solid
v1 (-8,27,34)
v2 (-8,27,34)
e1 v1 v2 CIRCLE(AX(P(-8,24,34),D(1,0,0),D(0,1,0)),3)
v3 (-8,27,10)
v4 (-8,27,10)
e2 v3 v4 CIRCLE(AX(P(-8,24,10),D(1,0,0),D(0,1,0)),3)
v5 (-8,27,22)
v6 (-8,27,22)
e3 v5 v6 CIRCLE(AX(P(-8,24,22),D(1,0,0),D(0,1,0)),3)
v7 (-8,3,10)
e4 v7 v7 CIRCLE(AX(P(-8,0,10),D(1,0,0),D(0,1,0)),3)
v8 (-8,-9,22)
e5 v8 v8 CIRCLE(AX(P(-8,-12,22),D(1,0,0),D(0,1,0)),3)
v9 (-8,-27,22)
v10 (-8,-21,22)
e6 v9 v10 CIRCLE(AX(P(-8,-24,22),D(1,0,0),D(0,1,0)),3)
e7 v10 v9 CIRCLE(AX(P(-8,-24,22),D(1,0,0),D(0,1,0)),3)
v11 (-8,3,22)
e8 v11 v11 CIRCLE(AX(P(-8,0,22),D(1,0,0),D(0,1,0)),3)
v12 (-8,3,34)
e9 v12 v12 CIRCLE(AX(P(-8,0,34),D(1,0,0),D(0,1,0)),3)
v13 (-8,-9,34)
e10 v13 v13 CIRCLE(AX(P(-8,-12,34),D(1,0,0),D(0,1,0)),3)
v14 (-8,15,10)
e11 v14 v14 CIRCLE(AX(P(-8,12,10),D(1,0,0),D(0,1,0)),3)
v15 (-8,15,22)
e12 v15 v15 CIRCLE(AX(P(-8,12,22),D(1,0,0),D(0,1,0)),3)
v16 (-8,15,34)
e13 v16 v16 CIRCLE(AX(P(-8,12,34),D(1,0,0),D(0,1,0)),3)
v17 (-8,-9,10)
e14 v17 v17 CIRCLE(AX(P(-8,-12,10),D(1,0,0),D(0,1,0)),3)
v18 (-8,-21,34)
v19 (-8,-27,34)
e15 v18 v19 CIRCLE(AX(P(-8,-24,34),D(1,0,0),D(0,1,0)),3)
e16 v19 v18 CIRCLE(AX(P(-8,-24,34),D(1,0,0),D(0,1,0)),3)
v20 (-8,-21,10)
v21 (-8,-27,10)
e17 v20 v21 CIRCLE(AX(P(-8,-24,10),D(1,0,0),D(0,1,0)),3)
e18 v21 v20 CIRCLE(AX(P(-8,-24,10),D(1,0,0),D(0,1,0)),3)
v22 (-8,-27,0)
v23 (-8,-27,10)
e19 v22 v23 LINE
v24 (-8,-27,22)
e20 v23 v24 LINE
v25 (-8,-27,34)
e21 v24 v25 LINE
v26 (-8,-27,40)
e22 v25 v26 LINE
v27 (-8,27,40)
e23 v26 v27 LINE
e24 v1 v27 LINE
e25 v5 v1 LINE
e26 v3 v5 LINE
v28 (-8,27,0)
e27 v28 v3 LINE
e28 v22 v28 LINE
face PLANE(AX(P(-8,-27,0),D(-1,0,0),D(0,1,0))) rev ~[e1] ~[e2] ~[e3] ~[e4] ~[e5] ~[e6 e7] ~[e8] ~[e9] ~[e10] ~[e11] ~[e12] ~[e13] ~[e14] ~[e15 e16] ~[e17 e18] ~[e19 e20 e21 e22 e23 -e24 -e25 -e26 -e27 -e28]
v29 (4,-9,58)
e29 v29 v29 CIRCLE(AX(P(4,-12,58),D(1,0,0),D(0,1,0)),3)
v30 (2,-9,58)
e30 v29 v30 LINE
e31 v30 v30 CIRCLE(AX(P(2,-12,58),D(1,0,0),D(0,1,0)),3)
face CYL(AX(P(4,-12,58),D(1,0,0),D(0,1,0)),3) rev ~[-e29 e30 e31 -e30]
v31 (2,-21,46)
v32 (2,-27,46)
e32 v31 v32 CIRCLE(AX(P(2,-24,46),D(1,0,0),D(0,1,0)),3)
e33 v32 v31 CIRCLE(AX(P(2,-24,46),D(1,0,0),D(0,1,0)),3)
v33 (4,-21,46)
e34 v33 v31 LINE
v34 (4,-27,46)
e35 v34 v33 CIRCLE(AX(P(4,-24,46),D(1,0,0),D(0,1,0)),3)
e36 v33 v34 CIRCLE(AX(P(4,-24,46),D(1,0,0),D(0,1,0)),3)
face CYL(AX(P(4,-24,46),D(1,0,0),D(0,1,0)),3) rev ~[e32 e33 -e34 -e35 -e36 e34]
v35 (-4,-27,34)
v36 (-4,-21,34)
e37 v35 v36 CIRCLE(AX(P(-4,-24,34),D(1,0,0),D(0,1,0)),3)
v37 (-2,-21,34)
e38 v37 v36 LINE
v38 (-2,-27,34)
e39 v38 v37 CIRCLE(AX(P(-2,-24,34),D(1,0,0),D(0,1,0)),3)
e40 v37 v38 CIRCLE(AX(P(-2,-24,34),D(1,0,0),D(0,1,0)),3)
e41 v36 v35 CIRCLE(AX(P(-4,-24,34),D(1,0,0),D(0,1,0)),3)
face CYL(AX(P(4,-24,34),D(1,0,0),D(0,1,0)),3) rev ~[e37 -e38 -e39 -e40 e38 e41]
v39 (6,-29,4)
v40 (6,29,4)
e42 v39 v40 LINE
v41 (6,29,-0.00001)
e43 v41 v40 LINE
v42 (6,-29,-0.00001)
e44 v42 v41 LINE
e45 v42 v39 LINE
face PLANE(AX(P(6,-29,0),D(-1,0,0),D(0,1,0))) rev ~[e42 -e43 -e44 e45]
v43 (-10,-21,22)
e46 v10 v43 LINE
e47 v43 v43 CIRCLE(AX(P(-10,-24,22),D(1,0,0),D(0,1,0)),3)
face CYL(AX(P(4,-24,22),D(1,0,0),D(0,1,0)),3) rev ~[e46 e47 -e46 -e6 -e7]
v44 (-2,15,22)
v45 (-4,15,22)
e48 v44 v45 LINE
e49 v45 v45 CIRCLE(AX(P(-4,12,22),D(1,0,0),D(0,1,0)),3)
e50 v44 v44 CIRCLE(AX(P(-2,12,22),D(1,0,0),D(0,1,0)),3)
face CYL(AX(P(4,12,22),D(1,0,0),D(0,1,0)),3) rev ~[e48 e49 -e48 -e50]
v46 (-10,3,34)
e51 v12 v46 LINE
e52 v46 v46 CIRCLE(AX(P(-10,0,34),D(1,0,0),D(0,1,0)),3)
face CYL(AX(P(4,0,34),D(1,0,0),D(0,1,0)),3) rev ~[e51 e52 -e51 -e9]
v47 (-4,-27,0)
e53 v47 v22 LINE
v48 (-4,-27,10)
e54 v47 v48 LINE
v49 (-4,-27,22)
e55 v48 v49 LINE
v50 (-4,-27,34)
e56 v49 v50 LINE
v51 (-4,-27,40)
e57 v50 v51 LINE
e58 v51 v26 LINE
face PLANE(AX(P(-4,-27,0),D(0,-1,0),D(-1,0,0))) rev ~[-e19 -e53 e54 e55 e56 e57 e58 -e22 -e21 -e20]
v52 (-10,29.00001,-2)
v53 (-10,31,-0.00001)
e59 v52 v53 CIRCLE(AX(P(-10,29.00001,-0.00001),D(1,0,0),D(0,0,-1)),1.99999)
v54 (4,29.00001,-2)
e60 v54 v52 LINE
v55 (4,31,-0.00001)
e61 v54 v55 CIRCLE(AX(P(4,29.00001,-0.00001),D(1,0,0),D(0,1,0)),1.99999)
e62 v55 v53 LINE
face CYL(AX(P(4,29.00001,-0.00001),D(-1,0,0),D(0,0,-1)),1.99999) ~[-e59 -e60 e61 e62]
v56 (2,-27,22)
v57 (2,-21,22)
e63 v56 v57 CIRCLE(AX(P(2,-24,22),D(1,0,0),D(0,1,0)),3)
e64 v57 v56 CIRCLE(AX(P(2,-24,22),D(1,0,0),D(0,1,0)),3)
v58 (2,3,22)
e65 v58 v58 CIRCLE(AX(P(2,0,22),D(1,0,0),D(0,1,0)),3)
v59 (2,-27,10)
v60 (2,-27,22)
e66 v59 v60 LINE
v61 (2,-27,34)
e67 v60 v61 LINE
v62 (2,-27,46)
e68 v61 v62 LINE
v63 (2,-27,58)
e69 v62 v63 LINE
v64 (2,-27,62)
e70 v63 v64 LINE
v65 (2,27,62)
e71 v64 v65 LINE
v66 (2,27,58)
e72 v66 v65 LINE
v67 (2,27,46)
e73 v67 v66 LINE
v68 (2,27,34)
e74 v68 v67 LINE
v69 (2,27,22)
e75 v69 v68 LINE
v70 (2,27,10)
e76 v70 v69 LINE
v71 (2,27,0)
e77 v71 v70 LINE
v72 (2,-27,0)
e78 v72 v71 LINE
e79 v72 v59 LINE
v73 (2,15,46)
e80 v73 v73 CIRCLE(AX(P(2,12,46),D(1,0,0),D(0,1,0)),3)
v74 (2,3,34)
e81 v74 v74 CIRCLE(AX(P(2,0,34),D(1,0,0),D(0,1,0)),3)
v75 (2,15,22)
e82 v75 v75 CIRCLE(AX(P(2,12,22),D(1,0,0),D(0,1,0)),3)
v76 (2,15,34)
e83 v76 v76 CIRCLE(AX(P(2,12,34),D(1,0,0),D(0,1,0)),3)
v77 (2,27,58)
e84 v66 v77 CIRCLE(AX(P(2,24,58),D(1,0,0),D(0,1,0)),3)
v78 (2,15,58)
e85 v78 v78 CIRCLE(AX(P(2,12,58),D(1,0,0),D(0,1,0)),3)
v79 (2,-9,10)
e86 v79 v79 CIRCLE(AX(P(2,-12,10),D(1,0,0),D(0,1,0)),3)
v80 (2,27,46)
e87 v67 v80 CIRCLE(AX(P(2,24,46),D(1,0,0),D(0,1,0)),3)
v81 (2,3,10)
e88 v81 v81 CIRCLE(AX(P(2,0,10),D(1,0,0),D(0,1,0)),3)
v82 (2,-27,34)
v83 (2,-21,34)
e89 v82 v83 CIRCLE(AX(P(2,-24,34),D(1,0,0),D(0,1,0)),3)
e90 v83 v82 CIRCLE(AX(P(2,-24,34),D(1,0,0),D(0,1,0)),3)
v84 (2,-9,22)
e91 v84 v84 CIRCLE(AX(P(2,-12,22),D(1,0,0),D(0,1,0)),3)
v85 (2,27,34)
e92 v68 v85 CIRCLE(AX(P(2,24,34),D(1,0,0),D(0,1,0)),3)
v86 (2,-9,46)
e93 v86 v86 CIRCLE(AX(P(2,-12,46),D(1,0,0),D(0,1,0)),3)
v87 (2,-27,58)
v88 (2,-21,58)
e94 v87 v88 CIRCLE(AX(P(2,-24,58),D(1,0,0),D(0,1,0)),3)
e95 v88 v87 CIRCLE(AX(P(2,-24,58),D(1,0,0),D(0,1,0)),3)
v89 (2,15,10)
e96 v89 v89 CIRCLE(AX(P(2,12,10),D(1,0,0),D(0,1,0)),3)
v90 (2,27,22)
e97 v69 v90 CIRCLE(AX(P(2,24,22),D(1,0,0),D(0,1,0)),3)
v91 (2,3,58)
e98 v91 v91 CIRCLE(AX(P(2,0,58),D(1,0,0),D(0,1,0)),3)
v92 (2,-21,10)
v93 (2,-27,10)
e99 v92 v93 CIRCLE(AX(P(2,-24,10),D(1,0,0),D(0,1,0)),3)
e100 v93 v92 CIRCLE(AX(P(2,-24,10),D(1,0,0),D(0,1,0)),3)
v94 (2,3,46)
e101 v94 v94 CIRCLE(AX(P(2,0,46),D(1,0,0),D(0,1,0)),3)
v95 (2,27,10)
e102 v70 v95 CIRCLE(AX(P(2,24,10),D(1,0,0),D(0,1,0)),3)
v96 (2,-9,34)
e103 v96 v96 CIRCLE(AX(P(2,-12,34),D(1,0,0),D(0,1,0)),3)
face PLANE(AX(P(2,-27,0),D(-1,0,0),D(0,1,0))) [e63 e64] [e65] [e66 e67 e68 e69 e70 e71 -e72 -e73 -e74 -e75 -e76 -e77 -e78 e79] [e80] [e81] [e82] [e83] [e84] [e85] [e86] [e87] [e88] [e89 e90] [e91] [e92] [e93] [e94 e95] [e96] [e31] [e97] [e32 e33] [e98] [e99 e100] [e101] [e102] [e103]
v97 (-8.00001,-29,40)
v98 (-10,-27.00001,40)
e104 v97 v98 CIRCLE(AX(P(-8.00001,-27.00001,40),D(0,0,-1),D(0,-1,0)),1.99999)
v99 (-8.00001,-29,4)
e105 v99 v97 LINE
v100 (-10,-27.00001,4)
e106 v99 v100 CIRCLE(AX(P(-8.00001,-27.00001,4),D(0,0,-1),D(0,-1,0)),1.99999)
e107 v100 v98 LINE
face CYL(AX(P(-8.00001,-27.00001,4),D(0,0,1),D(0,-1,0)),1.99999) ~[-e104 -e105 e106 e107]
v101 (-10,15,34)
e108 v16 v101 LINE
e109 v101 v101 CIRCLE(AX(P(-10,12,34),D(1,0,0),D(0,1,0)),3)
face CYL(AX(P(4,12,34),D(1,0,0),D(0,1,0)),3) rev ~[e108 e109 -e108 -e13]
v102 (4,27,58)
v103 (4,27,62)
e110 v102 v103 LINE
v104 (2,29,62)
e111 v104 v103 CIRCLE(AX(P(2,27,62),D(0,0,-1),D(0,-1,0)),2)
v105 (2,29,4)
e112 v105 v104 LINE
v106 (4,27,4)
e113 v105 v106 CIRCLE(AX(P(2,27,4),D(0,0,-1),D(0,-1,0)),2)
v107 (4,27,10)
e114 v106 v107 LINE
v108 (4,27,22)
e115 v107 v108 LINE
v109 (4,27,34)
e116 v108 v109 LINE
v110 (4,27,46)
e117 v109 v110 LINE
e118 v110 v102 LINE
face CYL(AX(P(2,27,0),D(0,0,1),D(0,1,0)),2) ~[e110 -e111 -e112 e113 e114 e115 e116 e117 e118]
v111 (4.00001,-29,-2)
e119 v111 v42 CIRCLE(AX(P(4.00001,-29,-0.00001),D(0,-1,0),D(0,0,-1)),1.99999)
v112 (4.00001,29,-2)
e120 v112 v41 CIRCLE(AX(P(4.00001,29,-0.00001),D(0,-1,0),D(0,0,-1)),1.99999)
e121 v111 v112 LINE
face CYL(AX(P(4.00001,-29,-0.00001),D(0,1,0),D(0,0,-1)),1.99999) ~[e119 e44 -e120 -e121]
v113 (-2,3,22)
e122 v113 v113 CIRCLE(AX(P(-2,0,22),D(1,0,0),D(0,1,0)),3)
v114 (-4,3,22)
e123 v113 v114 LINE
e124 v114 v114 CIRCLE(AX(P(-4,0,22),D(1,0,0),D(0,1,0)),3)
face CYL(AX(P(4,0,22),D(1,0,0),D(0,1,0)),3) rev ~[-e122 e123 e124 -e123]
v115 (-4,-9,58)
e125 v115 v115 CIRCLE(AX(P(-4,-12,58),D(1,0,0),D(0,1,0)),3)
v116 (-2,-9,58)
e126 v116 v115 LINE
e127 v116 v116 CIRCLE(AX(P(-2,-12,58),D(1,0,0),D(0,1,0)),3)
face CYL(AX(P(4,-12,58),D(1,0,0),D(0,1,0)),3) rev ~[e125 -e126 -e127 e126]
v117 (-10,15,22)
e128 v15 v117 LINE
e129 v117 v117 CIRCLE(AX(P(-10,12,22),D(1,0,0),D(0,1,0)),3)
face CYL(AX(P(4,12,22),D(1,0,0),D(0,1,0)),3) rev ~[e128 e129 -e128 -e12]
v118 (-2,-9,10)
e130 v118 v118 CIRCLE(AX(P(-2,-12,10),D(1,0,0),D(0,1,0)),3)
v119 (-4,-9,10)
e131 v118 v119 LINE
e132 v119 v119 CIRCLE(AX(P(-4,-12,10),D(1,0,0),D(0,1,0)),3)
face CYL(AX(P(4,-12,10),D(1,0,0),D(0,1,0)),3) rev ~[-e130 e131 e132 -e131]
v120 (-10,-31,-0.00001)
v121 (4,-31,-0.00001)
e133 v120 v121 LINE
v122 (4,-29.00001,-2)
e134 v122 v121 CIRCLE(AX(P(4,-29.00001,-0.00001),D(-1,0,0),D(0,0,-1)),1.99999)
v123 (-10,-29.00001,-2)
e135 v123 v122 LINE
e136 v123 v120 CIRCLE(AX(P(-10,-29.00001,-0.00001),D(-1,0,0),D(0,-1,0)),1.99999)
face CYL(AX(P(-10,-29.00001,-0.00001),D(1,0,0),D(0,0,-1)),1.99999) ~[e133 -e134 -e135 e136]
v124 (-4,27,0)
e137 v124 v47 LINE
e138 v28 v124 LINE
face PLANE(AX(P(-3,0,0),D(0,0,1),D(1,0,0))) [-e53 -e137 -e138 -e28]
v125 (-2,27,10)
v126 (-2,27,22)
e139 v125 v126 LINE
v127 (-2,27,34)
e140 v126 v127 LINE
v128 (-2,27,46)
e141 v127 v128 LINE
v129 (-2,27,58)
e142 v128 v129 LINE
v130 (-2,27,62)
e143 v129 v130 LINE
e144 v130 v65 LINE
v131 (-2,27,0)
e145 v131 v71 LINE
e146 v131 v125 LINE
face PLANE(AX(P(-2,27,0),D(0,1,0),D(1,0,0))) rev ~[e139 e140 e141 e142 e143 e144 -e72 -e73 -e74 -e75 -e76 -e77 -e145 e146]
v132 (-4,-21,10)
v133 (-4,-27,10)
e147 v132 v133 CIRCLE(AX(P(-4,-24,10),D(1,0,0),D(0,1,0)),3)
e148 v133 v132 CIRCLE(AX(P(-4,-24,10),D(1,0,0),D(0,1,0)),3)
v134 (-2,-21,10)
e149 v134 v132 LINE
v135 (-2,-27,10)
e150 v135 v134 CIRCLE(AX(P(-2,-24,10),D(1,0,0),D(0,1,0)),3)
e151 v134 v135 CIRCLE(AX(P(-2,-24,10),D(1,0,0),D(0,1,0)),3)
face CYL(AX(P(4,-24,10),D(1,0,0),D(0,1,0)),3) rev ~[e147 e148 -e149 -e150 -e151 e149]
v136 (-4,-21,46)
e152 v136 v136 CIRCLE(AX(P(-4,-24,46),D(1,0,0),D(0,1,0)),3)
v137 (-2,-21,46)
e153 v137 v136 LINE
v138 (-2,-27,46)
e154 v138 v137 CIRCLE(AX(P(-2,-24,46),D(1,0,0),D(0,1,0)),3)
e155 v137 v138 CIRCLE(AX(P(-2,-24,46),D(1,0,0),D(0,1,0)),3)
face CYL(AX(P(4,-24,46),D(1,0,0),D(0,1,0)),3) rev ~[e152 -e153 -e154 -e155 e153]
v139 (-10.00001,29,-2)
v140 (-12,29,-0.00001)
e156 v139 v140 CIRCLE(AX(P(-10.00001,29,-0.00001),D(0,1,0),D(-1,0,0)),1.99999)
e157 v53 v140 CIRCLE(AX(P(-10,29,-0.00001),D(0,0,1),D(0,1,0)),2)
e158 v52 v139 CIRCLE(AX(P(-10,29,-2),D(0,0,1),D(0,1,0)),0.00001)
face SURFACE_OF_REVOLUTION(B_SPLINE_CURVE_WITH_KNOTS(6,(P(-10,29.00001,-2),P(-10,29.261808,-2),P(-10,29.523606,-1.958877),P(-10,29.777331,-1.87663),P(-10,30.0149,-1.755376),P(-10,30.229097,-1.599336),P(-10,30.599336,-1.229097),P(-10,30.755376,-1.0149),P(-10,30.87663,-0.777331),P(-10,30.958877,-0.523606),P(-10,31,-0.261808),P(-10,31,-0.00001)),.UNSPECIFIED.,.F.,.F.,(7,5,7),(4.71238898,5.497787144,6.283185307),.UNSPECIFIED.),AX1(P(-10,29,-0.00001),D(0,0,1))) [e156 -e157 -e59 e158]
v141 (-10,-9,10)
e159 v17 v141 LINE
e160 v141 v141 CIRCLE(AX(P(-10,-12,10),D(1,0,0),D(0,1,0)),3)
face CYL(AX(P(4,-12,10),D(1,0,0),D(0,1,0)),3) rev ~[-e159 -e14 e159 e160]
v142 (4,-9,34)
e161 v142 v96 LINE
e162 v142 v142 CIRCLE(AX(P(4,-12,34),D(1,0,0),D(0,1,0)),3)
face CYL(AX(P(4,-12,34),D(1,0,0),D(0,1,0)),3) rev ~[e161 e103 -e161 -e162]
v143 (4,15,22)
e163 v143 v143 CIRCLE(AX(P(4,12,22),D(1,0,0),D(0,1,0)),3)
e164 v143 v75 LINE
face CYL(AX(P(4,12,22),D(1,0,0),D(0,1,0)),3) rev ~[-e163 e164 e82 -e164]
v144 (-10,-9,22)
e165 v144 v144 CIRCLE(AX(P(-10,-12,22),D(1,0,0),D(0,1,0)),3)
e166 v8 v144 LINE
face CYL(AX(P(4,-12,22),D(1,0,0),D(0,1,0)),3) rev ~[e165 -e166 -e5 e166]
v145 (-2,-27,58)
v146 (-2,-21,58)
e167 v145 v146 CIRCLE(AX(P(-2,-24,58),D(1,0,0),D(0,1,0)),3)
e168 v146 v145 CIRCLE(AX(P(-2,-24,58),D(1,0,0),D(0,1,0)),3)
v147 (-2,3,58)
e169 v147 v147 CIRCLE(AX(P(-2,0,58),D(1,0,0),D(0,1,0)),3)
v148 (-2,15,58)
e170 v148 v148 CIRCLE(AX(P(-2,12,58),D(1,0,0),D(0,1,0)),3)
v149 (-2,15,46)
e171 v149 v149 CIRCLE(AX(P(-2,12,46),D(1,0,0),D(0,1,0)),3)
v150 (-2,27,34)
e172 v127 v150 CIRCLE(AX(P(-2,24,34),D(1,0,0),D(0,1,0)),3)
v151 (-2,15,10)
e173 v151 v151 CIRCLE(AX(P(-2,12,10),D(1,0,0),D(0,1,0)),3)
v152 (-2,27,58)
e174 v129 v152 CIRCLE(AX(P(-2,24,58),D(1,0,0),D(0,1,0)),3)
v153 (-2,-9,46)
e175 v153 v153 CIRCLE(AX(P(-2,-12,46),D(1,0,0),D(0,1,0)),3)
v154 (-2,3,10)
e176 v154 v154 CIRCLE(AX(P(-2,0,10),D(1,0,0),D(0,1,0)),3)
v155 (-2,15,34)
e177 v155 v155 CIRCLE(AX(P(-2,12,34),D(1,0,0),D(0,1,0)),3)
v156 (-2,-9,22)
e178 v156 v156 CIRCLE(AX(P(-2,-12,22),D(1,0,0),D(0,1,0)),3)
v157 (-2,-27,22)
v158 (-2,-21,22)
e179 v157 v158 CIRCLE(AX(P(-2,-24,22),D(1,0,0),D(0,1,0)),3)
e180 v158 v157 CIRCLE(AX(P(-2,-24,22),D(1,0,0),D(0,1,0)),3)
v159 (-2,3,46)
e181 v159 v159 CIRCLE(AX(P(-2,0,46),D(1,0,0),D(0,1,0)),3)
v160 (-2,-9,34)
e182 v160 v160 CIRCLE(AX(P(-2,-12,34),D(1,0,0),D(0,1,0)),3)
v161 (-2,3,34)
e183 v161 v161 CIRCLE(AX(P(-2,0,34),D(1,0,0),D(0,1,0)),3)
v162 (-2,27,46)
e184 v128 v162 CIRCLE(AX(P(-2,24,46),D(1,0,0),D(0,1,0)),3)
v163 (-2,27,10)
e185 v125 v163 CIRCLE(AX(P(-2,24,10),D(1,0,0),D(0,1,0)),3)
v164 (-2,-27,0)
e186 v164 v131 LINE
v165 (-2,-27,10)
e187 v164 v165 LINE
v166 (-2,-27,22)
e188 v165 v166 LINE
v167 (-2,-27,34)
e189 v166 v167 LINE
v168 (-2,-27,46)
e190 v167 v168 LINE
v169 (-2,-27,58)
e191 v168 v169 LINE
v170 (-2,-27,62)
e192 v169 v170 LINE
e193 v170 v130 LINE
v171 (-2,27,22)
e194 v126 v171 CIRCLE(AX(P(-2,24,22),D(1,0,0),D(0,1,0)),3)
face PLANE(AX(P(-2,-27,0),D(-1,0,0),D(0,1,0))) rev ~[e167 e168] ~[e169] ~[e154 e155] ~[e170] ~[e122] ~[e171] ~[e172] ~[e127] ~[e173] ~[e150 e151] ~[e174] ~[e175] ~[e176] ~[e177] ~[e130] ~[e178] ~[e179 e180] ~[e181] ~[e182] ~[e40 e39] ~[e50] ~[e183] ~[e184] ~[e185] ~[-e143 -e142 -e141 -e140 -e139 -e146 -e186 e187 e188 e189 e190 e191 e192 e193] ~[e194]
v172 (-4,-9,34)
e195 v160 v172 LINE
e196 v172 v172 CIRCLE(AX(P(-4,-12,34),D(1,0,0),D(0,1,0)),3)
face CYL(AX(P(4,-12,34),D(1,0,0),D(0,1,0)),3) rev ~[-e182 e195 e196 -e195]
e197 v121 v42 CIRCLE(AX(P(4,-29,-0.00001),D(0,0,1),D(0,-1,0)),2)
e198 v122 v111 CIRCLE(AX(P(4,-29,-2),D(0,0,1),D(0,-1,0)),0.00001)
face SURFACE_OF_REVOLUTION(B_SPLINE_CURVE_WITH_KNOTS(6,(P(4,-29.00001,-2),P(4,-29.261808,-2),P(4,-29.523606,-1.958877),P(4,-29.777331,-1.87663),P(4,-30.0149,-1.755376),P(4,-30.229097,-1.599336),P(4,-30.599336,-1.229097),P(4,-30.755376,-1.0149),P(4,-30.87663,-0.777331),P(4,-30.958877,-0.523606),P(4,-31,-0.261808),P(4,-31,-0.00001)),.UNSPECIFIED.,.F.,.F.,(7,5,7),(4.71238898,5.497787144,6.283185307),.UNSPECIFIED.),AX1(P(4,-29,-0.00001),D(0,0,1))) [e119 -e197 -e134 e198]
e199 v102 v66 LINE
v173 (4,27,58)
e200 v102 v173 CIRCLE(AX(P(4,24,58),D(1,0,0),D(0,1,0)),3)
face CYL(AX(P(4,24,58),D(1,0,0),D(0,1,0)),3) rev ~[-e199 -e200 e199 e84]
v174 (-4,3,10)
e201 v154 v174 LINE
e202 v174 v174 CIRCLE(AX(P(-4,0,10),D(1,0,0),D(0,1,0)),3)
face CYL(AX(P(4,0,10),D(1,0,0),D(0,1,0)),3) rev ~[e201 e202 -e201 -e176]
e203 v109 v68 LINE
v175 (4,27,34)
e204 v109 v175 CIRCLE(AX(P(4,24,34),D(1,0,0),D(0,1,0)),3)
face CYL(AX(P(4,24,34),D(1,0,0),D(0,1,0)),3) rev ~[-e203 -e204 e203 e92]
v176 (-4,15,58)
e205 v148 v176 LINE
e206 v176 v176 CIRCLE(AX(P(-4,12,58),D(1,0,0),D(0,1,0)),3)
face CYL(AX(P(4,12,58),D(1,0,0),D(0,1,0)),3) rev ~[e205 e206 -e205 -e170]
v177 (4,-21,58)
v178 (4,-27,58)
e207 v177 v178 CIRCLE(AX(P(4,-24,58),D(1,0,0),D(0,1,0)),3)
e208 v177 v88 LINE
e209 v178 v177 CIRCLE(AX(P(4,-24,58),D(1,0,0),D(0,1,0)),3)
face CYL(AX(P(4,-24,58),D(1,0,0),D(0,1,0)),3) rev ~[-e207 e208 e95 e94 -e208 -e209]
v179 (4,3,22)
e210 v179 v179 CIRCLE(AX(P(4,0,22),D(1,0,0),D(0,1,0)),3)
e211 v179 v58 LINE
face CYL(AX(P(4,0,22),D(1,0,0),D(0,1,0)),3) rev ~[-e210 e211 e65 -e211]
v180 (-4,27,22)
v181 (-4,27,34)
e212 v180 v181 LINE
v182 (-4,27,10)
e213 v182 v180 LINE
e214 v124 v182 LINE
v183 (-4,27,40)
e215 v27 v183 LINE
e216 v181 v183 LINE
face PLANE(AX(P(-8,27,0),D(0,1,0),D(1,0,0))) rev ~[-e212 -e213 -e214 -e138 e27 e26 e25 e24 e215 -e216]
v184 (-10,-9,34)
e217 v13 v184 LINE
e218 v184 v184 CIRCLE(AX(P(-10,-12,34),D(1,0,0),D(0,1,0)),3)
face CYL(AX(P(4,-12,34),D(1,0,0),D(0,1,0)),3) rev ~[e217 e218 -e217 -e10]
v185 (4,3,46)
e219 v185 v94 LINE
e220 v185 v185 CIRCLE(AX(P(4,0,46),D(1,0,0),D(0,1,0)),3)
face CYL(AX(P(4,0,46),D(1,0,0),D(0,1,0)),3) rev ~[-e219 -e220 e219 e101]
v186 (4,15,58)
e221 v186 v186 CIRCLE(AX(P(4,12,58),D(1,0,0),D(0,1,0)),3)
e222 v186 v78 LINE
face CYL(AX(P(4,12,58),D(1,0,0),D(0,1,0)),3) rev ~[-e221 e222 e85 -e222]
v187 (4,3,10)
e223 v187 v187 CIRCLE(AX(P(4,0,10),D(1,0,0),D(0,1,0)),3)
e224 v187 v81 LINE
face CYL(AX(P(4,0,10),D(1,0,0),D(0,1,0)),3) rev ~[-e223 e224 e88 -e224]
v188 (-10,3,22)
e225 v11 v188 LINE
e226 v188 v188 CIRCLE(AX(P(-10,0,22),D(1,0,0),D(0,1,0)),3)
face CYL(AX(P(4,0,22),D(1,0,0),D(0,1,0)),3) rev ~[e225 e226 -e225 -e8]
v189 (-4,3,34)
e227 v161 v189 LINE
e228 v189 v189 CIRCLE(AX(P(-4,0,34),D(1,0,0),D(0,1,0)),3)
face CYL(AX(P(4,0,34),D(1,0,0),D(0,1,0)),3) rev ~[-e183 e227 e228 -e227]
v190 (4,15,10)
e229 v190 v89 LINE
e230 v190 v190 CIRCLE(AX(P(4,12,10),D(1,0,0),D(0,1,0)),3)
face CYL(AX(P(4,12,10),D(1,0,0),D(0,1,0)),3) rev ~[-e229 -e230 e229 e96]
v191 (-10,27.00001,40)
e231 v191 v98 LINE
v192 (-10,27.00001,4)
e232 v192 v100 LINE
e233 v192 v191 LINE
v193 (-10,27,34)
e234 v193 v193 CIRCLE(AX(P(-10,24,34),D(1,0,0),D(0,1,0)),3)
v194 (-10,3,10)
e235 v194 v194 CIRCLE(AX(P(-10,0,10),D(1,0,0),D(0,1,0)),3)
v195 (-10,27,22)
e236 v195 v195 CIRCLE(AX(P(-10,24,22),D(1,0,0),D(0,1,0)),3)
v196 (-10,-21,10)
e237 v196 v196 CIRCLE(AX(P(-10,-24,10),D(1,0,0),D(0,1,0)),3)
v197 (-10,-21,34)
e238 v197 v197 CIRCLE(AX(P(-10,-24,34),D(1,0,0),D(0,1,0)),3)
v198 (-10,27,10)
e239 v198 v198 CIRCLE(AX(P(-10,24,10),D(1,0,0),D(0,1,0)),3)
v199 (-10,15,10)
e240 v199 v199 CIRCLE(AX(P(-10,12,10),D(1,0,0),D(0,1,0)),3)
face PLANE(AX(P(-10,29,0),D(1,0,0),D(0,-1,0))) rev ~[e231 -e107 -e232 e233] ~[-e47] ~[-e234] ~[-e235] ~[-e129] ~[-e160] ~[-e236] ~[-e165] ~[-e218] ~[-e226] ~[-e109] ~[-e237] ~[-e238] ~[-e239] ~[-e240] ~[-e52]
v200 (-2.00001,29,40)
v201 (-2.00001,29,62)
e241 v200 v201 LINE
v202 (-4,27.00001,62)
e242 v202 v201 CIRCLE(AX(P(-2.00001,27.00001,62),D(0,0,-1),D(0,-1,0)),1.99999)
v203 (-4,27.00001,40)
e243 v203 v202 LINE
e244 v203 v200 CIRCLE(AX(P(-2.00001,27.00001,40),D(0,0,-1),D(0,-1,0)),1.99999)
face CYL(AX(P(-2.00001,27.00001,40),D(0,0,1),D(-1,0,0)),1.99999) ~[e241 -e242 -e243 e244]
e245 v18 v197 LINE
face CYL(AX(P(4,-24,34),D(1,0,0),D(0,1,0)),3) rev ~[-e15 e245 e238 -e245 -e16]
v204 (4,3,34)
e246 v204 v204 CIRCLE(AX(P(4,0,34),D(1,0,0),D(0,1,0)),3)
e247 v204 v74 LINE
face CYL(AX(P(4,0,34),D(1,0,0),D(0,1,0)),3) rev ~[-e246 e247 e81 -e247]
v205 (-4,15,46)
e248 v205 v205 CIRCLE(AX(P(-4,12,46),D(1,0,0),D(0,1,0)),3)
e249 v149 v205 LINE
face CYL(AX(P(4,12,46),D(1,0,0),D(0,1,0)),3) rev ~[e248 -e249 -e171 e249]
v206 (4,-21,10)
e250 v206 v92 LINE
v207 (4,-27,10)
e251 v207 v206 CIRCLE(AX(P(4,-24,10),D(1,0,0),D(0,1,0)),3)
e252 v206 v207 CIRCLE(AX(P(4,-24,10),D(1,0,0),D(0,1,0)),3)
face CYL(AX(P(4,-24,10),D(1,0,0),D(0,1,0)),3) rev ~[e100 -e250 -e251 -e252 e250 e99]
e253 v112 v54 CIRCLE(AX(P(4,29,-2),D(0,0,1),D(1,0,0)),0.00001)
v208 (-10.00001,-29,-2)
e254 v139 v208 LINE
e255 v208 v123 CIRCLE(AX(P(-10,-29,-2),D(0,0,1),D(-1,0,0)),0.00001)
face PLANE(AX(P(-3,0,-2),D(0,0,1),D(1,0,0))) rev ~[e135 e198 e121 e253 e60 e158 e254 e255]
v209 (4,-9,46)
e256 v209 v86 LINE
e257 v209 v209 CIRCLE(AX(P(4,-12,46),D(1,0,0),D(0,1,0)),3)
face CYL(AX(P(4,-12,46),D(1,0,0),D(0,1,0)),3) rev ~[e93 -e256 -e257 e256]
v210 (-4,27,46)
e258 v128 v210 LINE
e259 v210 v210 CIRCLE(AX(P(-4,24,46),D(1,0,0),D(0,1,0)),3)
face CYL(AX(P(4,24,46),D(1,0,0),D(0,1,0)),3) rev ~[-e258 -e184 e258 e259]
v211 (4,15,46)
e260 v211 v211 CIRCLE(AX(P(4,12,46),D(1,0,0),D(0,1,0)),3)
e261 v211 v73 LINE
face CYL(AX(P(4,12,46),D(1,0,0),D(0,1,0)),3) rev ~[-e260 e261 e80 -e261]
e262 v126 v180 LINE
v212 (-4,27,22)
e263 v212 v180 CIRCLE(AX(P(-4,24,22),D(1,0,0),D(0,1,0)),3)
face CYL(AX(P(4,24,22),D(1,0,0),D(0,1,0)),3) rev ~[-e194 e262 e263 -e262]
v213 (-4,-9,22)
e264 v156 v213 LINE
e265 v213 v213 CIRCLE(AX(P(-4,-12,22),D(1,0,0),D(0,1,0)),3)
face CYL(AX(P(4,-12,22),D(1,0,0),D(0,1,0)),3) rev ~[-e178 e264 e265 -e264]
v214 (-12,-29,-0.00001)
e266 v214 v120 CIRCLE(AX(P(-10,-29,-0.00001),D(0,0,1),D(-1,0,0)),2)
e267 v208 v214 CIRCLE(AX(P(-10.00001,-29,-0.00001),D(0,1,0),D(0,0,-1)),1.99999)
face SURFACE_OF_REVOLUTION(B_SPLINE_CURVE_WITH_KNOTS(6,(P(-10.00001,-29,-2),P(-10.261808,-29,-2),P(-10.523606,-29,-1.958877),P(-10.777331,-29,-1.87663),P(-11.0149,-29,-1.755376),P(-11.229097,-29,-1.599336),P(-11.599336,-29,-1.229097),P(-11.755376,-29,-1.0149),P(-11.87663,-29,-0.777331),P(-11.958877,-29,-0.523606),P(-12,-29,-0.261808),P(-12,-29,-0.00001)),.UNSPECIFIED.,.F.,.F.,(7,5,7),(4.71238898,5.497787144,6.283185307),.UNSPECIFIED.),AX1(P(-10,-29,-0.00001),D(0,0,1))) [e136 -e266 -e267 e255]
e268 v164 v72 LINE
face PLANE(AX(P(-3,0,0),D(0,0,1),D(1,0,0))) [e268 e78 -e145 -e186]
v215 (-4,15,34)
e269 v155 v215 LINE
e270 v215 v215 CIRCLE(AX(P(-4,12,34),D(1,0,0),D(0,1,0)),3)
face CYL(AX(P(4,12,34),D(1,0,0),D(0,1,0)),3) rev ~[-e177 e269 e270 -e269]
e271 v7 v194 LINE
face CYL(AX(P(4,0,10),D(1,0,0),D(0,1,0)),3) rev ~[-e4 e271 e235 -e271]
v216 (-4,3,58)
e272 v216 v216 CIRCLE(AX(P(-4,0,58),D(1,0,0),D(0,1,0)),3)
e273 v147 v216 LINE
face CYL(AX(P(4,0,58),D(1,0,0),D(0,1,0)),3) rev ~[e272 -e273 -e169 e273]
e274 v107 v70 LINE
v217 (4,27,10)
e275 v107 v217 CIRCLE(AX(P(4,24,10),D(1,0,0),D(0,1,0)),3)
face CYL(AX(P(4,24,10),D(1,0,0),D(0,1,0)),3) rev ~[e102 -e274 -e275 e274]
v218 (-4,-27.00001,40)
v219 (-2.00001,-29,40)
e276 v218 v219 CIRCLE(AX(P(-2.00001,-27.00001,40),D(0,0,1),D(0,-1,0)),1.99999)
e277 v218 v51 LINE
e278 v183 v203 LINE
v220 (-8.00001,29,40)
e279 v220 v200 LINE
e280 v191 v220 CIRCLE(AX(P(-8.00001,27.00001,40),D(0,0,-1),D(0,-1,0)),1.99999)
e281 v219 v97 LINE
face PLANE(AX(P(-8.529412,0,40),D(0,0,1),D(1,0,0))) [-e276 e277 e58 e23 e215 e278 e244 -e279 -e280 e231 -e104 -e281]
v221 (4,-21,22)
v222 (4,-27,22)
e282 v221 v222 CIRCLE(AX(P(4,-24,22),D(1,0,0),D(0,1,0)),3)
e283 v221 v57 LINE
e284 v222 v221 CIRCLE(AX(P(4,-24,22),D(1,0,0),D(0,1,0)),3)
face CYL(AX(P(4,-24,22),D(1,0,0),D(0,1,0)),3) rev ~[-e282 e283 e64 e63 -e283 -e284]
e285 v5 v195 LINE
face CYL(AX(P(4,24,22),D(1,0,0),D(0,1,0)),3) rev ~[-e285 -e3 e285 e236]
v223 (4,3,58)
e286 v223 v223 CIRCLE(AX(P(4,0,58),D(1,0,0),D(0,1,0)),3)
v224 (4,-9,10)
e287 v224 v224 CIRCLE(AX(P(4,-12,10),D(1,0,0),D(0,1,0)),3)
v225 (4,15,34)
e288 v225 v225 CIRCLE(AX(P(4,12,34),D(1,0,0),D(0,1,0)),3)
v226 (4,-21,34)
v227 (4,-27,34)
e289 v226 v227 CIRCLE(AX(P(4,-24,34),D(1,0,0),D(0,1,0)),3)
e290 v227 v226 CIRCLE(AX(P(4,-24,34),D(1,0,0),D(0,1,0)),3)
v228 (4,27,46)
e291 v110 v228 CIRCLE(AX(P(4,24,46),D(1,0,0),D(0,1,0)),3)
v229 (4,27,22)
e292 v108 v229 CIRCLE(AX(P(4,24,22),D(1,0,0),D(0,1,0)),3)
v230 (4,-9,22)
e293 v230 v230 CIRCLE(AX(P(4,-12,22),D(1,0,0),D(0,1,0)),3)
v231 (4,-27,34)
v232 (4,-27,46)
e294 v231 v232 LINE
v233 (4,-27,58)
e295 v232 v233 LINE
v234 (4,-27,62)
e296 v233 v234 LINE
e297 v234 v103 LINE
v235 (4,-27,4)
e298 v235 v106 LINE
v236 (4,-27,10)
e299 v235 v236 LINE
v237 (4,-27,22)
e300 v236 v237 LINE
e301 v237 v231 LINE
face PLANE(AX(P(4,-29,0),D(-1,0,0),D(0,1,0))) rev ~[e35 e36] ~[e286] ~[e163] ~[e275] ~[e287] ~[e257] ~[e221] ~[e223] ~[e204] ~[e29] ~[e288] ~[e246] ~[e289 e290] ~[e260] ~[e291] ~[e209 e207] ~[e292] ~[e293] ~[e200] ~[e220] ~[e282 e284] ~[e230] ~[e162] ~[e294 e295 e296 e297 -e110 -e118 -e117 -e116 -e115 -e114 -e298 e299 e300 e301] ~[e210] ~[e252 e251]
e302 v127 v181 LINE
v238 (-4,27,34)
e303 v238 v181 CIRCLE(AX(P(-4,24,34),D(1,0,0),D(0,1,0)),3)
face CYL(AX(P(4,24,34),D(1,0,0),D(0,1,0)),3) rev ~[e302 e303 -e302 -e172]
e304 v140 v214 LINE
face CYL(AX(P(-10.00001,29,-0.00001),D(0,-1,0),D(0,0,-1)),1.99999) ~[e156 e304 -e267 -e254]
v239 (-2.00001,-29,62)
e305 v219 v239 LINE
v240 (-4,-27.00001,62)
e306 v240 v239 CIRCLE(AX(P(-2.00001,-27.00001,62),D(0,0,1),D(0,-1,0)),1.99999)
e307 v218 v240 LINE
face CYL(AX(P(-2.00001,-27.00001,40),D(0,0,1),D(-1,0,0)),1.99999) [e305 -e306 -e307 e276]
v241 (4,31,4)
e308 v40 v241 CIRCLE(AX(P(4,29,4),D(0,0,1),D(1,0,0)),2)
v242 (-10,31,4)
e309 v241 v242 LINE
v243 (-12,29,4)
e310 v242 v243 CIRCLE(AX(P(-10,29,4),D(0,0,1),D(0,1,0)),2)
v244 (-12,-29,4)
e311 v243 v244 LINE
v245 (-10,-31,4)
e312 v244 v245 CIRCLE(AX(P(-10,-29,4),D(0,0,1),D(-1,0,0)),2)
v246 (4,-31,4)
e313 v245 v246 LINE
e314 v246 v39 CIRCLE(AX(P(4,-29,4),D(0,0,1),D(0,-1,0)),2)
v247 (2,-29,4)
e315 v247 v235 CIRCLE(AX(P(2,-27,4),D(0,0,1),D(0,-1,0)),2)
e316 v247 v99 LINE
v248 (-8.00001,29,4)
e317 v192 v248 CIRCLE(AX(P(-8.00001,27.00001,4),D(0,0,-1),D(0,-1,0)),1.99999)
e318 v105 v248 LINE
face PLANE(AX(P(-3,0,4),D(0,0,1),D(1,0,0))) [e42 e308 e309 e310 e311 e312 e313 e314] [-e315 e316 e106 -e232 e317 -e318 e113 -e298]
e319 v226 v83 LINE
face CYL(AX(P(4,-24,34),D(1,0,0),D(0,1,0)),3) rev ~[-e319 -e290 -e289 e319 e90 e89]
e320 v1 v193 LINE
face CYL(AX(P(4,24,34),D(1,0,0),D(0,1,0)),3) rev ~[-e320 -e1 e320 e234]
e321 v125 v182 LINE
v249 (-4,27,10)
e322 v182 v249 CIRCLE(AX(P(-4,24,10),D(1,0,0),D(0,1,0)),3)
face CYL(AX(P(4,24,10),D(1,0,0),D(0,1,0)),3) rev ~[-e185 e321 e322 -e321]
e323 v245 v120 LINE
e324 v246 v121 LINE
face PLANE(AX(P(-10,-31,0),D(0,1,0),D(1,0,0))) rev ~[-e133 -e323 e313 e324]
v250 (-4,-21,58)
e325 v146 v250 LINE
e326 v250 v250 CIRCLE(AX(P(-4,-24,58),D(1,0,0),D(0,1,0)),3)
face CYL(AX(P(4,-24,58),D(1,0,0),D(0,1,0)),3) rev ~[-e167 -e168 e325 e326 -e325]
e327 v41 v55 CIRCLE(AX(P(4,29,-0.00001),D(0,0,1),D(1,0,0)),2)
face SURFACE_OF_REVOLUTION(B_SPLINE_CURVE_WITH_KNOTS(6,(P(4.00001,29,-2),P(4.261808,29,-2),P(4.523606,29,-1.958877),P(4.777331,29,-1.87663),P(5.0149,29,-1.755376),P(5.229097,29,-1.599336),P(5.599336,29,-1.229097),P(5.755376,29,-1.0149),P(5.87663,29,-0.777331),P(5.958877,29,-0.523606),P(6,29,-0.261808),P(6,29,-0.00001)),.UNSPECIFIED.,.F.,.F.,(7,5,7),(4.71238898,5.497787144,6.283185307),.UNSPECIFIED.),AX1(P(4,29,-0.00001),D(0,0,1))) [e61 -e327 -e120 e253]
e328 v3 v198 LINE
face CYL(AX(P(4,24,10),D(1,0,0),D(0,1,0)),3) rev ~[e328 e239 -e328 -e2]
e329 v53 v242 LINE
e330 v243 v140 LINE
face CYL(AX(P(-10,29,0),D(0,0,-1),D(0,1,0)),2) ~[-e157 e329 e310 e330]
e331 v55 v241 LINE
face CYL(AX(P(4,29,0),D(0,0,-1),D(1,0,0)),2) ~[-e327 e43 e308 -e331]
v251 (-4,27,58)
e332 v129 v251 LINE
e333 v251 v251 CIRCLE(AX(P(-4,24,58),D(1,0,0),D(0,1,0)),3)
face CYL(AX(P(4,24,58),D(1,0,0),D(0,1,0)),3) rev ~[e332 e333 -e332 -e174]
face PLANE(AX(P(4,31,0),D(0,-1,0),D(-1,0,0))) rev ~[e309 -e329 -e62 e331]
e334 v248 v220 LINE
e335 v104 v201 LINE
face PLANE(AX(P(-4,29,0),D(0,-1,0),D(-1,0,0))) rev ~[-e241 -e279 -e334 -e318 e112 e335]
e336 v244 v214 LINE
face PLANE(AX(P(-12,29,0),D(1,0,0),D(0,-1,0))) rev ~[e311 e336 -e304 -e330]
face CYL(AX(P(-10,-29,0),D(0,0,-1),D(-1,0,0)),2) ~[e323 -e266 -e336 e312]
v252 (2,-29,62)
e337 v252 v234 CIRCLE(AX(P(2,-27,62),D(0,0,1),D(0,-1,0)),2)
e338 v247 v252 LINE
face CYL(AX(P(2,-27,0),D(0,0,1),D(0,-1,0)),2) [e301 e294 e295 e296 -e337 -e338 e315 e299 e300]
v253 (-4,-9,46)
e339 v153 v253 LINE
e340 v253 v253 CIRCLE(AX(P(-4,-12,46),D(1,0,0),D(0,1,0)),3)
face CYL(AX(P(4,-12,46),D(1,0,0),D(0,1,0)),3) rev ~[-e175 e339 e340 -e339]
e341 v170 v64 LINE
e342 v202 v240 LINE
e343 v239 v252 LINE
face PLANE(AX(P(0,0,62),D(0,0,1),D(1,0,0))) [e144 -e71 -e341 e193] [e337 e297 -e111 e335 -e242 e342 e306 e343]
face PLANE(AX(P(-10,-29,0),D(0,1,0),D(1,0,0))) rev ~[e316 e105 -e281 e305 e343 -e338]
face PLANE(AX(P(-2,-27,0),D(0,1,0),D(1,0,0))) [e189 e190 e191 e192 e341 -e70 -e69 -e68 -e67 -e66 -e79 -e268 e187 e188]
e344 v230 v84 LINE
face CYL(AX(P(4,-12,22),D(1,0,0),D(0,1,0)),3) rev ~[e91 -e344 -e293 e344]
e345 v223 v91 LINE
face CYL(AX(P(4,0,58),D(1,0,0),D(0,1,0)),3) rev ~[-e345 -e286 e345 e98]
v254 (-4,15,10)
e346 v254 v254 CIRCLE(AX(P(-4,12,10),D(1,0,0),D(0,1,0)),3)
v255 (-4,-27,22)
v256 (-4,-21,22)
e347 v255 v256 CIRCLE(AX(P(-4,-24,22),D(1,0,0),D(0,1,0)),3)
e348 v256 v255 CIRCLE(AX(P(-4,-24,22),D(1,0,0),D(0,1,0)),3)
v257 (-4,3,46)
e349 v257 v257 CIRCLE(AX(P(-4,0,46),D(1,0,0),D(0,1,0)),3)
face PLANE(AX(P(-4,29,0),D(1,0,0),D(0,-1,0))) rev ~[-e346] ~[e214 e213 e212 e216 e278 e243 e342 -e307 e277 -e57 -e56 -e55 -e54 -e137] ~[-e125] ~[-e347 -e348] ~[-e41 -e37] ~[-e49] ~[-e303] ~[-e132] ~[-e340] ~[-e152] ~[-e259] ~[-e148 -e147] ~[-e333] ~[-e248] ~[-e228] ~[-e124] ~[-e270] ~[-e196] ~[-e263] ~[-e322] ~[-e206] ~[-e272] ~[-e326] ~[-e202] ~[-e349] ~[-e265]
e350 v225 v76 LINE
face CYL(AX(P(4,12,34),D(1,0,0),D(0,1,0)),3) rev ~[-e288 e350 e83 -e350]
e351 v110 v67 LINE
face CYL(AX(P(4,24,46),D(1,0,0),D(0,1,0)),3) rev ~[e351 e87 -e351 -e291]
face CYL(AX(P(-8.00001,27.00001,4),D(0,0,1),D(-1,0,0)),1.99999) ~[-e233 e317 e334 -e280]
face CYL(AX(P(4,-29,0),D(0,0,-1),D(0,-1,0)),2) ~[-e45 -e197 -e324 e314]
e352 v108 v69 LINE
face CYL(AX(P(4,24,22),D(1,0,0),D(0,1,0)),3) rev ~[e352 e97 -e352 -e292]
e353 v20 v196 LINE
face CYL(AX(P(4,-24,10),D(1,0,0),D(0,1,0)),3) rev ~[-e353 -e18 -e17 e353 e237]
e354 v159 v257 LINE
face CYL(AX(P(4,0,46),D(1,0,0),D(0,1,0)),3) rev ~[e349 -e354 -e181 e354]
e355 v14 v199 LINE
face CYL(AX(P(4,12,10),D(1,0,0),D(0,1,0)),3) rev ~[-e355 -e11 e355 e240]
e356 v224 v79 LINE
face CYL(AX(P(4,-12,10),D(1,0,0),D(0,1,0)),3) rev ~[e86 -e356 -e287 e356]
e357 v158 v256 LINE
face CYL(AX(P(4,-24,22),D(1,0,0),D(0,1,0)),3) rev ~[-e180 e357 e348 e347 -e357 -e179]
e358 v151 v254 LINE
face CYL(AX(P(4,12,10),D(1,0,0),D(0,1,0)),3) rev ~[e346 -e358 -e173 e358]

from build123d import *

# Parameters (mm, degrees)
F0_W     = 4
F0_H     = 54
F1_DEPTH = 62
F2_DEPTH = 40
F4_R     = 2
F5_R     = 3
F6_DEPTH = 14.001
F8_DEPTH = 2
F9_DEPTH = 4
F10_R    = 1.99999


# Not quite as in the source:
# - a fillet or chamfer is up to 0.001 mm smaller than in the source, because OpenCascade refuses the exact size
# - a feature of the source that left no trace in its solid (it failed there, or was rolled back) is left out


with BuildPart() as f1:
    # F0 (on Top) → F1 (new body)
    with BuildSketch(Plane.XY):
        Polygon((4, -29), (4, 29), (-4, 29), (-4, 27), (-4, -27), (-4, -29), align=None)
        Rectangle(F0_W, F0_H, mode=Mode.SUBTRACT)
    extrude(amount=F1_DEPTH)

    # F0 (on Top) → F2 (join)
    with BuildSketch(Plane.XY):
        Polygon((-4, 27), (-4, 29), (-10, 29), (-10, 27), (-10, -27), (-10, -29), (-4, -29), (-4, -27), (-8, -27), (-8, 27), align=None)
    extrude(amount=F2_DEPTH)

    # F4
    f4_edges = [f1.edges().sort_by_distance(p)[0] for p in [
        (4, -29, 31),
        (4, 29, 31),
    ]]
    fillet(f4_edges, radius=F4_R)

    # F5 (on face) → F6 (cut, through all)
    with BuildSketch(Plane.YZ.offset(4)):
        with Locations((-24, 10)):
            Circle(F5_R)
        with Locations((-24, 22)):
            Circle(F5_R)
        with Locations((-24, 34)):
            Circle(F5_R)
        with Locations((-24, 46)):
            Circle(F5_R)
        with Locations((-12, 10)):
            Circle(F5_R)
        with Locations((-12, 22)):
            Circle(F5_R)
        with Locations((-12, 34)):
            Circle(F5_R)
        with Locations((-12, 46)):
            Circle(F5_R)
        with Locations((0, 10)):
            Circle(F5_R)
        with Locations((0, 22)):
            Circle(F5_R)
        with Locations((0, 34)):
            Circle(F5_R)
        with Locations((0, 46)):
            Circle(F5_R)
        with Locations((12, 10)):
            Circle(F5_R)
        with Locations((12, 22)):
            Circle(F5_R)
        with Locations((12, 34)):
            Circle(F5_R)
        with Locations((12, 46)):
            Circle(F5_R)
        with Locations((24, 10)):
            Circle(F5_R)
        with Locations((24, 22)):
            Circle(F5_R)
        with Locations((24, 34)):
            Circle(F5_R)
        with Locations((24, 46)):
            Circle(F5_R)
        with Locations((-24, 58)):
            Circle(F5_R)
        with Locations((-12, 58)):
            Circle(F5_R)
        with Locations((0, 58)):
            Circle(F5_R)
        with Locations((12, 58)):
            Circle(F5_R)
        with Locations((24, 58)):
            Circle(F5_R)
    extrude(amount=-F6_DEPTH, mode=Mode.SUBTRACT)

    # F7 (on face) → F8 (join)
    with BuildSketch(Plane.XY):
        with BuildLine():
            ThreePointArc((4, -31), (5.4142135624, -30.4142135624), (6, -29))
            Line((6, -29), (6, 29))
            ThreePointArc((6, 29), (5.4142135624, 30.4142135624), (4, 31))
            Line((4, 31), (-10, 31))
            ThreePointArc((-10, 31), (-11.4142135624, 30.4142135624), (-12, 29))
            Line((-12, 29), (-12, -29))
            ThreePointArc((-12, -29), (-11.4142135624, -30.4142135624), (-10, -31))
            Line((-10, -31), (4, -31))
        make_face()
    extrude(amount=-F8_DEPTH)

    # F9 (add): a face of the model
    f9_faces = [f1.faces().sort_by_distance(p)[0] for p in [
        (-10.957705074, -29.957705074, 0),
    ]]
    extrude(f9_faces, amount=F9_DEPTH)

    # F10 (radius 2 in the source; OpenCascade refuses exactly that, so slightly less here)
    f10_edges = [f1.edges().sort_by_distance(p)[0] for p in [
        (6, 0, -2),
        (-11.414214, -30.414214, -2),
        (-12, 0, -2),
        (-11.414214, 30.414214, -2),
        (-3, 31, -2),
        (5.414214, 30.414214, -2),
        (5.414214, -30.414214, -2),
        (-4, -29, 51),
        (-4, 29, 51),
        (-10, -29, 22),
        (-10, 29, 22),
        (-3, -31, -2),
    ]]
    fillet(f10_edges, radius=F10_R)


solid = f1.part
